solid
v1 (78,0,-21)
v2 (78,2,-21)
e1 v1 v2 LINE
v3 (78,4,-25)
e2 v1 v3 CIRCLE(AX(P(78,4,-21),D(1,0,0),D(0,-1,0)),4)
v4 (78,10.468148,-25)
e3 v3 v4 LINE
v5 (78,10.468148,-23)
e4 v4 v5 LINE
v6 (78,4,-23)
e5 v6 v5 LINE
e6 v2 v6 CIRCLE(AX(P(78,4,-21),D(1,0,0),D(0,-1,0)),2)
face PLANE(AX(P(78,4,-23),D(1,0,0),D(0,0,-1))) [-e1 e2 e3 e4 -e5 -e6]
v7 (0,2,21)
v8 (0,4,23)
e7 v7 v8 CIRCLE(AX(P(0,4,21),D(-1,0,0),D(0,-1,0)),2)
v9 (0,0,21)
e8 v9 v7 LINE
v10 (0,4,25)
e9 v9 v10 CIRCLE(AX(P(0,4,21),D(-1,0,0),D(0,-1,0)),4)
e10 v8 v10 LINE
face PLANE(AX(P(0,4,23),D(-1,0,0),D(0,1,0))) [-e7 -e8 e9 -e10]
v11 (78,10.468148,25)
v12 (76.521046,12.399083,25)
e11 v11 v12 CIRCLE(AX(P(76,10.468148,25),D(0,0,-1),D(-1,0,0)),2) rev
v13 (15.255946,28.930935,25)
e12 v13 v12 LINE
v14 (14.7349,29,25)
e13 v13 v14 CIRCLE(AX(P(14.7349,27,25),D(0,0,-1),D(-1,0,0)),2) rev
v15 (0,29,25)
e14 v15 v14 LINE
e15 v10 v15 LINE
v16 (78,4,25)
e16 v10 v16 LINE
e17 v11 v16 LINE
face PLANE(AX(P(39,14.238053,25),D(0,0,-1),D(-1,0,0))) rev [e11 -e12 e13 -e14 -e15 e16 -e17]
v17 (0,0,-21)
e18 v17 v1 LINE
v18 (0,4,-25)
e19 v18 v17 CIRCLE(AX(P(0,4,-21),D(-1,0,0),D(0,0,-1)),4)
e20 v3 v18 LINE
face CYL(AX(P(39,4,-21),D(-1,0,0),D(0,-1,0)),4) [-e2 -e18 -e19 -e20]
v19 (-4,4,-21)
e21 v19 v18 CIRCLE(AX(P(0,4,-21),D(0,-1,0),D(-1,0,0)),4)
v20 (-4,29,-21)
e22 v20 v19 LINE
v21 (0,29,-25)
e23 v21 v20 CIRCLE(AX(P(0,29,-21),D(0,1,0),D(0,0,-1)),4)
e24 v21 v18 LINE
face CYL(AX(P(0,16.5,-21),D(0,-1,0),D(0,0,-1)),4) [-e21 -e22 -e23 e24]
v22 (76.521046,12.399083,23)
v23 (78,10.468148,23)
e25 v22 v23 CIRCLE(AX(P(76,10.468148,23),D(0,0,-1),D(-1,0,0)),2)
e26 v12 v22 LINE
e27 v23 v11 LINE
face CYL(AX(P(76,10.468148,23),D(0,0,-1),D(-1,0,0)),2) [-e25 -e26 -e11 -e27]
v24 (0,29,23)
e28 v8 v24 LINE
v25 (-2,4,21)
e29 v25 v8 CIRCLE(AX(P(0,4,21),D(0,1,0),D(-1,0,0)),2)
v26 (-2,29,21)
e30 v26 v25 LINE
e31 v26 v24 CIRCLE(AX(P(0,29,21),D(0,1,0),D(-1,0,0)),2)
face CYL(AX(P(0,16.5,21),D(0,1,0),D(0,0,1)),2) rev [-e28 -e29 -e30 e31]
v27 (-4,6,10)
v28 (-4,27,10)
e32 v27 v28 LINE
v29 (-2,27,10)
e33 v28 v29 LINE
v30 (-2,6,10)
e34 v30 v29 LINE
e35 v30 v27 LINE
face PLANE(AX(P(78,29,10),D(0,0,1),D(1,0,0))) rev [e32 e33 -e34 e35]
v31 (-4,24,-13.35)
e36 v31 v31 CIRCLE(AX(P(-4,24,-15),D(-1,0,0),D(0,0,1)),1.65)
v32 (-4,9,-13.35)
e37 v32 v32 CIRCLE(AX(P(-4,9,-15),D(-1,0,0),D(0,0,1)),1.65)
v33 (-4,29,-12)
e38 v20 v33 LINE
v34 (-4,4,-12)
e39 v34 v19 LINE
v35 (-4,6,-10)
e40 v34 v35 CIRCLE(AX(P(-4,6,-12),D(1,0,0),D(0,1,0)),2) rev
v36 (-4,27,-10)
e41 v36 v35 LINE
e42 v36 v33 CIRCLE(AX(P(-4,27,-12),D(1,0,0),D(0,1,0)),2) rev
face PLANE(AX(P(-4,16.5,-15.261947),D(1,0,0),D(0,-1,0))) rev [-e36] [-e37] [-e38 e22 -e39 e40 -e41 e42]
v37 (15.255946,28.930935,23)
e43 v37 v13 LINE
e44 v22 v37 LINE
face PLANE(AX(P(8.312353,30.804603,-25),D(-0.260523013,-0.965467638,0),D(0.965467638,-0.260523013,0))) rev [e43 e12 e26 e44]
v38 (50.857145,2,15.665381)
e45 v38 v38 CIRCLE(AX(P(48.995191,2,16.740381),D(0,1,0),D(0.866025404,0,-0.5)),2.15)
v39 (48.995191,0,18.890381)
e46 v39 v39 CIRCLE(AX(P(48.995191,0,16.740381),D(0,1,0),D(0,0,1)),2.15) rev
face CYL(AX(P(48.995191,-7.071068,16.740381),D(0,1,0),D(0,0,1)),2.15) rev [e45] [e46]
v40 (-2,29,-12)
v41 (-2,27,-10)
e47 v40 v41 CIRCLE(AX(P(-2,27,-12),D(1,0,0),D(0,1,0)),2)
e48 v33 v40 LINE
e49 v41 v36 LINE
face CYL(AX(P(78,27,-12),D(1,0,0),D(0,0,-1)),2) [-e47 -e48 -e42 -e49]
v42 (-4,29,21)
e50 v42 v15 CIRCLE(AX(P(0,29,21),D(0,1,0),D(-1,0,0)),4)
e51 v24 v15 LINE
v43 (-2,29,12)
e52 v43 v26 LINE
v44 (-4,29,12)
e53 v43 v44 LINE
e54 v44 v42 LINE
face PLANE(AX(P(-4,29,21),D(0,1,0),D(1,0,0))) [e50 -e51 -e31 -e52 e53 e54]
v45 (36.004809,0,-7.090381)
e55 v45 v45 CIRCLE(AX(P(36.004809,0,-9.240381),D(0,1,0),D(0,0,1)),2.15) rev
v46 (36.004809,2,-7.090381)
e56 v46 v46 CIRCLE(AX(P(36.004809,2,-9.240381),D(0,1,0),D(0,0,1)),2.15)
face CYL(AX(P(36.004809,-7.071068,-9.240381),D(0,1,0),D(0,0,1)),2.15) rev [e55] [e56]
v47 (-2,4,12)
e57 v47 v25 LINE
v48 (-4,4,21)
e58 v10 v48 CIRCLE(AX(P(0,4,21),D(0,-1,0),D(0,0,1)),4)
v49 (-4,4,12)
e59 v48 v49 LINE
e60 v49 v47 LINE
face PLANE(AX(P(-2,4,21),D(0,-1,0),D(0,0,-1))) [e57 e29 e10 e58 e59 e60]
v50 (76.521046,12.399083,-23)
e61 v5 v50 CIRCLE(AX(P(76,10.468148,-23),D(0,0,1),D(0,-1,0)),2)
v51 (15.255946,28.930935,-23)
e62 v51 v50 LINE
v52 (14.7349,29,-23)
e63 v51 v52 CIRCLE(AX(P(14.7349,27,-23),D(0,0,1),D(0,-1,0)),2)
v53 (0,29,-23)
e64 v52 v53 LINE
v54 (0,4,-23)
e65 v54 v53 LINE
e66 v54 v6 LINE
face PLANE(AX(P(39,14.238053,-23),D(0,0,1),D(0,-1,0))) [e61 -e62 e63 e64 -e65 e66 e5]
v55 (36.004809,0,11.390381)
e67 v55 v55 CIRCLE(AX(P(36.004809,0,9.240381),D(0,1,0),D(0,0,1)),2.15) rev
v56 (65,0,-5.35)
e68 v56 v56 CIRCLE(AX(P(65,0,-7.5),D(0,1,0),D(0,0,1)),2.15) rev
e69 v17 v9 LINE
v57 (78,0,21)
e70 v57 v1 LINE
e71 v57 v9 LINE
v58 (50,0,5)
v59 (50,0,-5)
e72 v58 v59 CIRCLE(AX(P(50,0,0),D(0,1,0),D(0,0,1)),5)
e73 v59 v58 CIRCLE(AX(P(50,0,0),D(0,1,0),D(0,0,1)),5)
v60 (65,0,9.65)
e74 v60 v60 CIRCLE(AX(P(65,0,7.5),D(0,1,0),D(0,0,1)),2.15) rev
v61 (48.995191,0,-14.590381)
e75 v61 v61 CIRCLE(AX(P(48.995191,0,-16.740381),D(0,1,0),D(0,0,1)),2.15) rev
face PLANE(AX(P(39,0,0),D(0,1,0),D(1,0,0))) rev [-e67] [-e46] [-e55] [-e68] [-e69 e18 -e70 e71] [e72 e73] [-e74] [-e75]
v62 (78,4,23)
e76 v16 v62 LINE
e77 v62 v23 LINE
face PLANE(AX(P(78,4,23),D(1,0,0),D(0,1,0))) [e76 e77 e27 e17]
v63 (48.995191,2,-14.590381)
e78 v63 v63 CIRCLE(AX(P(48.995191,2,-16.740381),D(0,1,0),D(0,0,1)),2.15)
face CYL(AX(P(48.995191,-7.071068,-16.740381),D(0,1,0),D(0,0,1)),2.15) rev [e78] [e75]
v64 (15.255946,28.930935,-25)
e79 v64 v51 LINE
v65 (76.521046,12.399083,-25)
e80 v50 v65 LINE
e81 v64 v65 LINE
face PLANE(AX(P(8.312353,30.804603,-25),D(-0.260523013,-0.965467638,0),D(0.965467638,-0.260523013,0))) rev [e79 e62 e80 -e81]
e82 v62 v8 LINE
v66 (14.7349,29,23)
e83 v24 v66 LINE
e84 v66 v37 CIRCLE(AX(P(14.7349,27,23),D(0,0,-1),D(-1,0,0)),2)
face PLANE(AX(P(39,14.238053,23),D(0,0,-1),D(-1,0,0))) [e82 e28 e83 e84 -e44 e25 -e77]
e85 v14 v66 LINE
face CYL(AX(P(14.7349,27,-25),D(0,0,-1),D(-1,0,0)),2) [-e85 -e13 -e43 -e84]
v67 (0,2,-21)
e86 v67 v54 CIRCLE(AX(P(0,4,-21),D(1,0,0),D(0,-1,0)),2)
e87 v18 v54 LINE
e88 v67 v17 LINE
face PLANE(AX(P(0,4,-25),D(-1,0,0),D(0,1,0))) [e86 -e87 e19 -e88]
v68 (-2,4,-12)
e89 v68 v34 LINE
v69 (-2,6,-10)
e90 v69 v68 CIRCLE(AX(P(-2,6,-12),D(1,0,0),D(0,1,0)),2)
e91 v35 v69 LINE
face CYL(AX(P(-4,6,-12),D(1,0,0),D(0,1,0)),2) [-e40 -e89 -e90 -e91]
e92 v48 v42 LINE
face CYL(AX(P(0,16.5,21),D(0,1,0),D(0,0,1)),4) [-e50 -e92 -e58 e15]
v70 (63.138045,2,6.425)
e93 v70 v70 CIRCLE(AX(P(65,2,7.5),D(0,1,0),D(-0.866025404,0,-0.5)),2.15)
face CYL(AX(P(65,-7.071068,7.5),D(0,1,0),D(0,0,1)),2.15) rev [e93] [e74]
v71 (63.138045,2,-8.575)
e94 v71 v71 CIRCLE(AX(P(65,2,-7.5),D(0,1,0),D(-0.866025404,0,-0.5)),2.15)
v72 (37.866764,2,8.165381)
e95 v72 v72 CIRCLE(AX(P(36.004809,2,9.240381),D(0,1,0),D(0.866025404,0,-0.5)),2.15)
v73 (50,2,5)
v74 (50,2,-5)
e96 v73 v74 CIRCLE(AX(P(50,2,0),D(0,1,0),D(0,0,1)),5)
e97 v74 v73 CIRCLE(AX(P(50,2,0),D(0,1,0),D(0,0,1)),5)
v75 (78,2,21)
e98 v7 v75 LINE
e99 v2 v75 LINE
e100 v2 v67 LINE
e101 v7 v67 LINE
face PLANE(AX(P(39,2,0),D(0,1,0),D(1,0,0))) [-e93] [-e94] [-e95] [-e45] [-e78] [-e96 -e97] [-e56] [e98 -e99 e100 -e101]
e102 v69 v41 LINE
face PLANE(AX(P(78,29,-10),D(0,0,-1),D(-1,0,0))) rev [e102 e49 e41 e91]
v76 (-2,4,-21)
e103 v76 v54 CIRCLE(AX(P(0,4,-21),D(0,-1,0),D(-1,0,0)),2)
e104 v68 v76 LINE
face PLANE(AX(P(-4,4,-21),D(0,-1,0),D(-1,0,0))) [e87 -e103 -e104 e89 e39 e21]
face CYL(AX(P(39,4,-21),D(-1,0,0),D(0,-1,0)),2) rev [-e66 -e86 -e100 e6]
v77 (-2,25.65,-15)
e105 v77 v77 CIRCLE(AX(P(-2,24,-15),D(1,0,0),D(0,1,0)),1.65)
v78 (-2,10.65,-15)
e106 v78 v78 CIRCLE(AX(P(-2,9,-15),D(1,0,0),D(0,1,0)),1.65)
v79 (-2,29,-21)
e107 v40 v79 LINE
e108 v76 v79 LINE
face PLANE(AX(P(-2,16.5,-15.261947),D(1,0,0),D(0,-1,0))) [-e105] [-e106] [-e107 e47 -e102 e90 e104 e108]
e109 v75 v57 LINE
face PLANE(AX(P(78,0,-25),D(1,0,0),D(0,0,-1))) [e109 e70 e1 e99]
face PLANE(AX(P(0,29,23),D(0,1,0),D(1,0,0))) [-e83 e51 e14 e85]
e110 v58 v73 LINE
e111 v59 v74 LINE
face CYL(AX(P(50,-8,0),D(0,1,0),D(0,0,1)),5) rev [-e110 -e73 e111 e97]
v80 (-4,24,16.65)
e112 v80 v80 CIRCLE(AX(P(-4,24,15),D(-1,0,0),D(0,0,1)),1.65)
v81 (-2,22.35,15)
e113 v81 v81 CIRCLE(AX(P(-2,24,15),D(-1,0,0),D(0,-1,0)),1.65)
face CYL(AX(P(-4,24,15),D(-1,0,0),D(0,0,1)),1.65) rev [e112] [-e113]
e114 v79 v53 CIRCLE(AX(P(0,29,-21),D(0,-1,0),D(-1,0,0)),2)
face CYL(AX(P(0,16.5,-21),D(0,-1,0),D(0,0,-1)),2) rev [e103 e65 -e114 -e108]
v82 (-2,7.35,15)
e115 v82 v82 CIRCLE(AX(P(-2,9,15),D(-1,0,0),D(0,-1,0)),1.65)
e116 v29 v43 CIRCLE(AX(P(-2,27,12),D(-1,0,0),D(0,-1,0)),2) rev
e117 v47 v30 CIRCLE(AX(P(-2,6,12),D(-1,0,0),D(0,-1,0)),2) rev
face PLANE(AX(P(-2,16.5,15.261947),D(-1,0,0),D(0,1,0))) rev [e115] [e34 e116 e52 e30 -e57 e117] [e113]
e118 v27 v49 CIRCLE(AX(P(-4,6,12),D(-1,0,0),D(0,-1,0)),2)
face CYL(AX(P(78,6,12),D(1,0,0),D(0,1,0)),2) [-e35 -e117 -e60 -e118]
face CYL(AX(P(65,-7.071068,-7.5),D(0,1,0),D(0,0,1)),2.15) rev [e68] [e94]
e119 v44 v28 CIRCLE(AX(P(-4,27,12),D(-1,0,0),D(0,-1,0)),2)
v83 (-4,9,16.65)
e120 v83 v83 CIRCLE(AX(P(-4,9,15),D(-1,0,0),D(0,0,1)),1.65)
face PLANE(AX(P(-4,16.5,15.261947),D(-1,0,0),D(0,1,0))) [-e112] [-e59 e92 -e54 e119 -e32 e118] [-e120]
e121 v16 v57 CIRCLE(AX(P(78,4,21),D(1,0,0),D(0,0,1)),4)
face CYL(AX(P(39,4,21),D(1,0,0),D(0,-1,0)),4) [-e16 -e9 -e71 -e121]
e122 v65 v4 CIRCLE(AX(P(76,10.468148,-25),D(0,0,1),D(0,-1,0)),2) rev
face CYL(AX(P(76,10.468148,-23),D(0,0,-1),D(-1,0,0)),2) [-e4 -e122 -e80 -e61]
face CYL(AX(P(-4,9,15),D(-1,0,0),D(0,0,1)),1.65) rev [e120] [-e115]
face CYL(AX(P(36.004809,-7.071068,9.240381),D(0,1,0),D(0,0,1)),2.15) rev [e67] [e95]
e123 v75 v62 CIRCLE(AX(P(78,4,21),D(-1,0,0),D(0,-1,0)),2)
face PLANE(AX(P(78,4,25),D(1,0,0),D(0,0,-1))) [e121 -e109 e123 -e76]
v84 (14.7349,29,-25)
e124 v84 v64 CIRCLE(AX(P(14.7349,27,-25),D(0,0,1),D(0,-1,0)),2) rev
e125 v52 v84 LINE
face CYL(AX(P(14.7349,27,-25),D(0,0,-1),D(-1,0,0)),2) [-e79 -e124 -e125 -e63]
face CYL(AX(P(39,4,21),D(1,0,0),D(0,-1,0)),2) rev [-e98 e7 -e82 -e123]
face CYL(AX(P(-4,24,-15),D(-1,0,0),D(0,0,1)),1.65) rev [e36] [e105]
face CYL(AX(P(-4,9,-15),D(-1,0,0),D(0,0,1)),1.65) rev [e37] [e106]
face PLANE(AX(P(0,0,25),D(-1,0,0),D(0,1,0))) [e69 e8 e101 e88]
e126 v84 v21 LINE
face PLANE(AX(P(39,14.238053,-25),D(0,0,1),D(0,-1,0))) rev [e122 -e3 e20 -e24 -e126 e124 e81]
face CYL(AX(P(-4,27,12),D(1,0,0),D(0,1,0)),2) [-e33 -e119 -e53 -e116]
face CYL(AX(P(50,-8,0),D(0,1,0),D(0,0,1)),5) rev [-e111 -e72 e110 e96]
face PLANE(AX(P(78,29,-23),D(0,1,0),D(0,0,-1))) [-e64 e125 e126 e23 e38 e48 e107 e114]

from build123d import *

# Parameters (mm, degrees)
EXTRUDE_1_DEPTH          = 78
EXTRUDE_START            = -4
EXTRUDE_1_2_OUTLINE_R    = 2.1
EXTRUDE_1_2_DEPTH        = 4
EXTRUDE_START_2          = -1
EXTRUDE_1_3_OUTLINE_R    = 5
EXTRUDE_1_3_OUTLINE_R_2  = 2.5
EXTRUDE_1_3_DEPTH        = 30
EXTRUDE_START_3          = -25
EXTRUDE_1_4_DEPTH        = 2
EXTRUDE_2_DEPTH          = 2
CUT_EXTRUDE_1_DEPTH      = 98.082439195
FILLET_1_R               = 2
EXTRUDE_START_4          = -2
SKETCH_4_R               = 2.1
SKETCH_4_R_2             = 1
EXTRUDE_3_DEPTH          = 2
HOLE_WIZARD_M4_1_D       = 3.3
HOLE_WIZARD_M4_1_DEPTH   = 11.5
HOLE_WIZARD_M4_1_TIP     = 0.991420021
SKETCH_8_W               = 20
SKETCH_8_H               = 25
CUT_EXTRUDE_2_DEPTH      = 91.498618774
FILLET_2_R               = 2
SKETCH_9_R               = 2.5
SKETCH_9_R_2             = 2.15
EXTRUDE_4_DEPTH          = 2
PATTERN_CIRCULAR_2_COUNT = 3


with BuildPart() as part:
    # ﾎﾞｽ - 押し出し1: read off the stored shape, not the designer's step
    # ﾎﾞｽ - 押し出し1 outline → ﾎﾞｽ - 押し出し1 (new body)
    with BuildSketch(Plane.YZ):
        with BuildLine():
            Line((29, 25), (4, 25))
            ThreePointArc((4, 25), (1.171572875, 23.828427125), (0, 21))
            Line((0, 21), (0, -21))
            ThreePointArc((0, -21), (1.171572875, -23.828427125), (4, -25))
            Line((4, -25), (29, -25))
            Line((29, -25), (29, -23))
            Line((29, -23), (4, -23))
            ThreePointArc((4, -23), (2.585786438, -22.414213562), (2, -21))
            Line((2, -21), (2, 21))
            ThreePointArc((2, 21), (2.585786438, 22.414213562), (4, 23))
            Line((4, 23), (29, 23))
            Line((29, 23), (29, 25))
        make_face()
    extrude(amount=EXTRUDE_1_DEPTH)

    # Extrude 1 2 outline → Extrude 1 2 (add)
    # profile 1 of 2: a face of its own
    with BuildSketch(Plane.YZ.offset(EXTRUDE_START)):
        with BuildLine():
            ThreePointArc((4, 8), (4.228361402, 6.851949703), (4.878679656, 5.878679656))
            ThreePointArc((4.878679656, 5.878679656), (5.851949703, 5.228361402), (7, 5))
            Line((7, 5), (26, 5))
            ThreePointArc((26, 5), (27.148050297, 5.228361402), (28.121320344, 5.878679656))
            ThreePointArc((28.121320344, 5.878679656), (28.771638598, 6.851949703), (29, 8))
            Line((29, 8), (29, 25))
            Line((29, 25), (4, 25))
            Line((4, 25), (4, 8))
        make_face()
        with Locations((9, 15)):
            Circle(EXTRUDE_1_2_OUTLINE_R, mode=Mode.SUBTRACT)
        with Locations((24, 15)):
            Circle(EXTRUDE_1_2_OUTLINE_R, mode=Mode.SUBTRACT)
    # profile 2 of 2: a face of its own
    with BuildSketch(Plane.YZ.offset(EXTRUDE_START)):
        with BuildLine():
            Line((4, -25), (29, -25))
            Line((29, -25), (29, -8))
            ThreePointArc((29, -8), (28.771638598, -6.851949703), (28.121320344, -5.878679656))
            ThreePointArc((28.121320344, -5.878679656), (27.148050297, -5.228361402), (26, -5))
            Line((26, -5), (7, -5))
            ThreePointArc((7, -5), (5.851949703, -5.228361402), (4.878679656, -5.878679656))
            ThreePointArc((4.878679656, -5.878679656), (4.228361402, -6.851949703), (4, -8))
            Line((4, -8), (4, -25))
        make_face()
        with Locations((9, -15)):
            Circle(EXTRUDE_1_2_OUTLINE_R, mode=Mode.SUBTRACT)
        with Locations((24, -15)):
            Circle(EXTRUDE_1_2_OUTLINE_R, mode=Mode.SUBTRACT)
    extrude(amount=EXTRUDE_1_2_DEPTH)

    # Extrude 1 3 outline → Extrude 1 3 (cut)
    with BuildSketch(Plane(origin=(0, 0, 0), x_dir=(1, 0, 0), z_dir=(0, 1, 0)).offset(EXTRUDE_START_2)):
        with Locations((50, 0)):
            Circle(EXTRUDE_1_3_OUTLINE_R)
        with BuildLine():
            Line((0, -5), (-2, -5))
            Line((-2, -5), (-2, -21))
            ThreePointArc((-2, -21), (-1.414213562, -22.414213562), (0, -23))
            Line((0, -23), (0, -5))
        make_face()
        with BuildLine():
            ThreePointArc((0, -25), (-2.828427125, -23.828427125), (-4, -21))
            Line((-4, -21), (-4, -25))
            Line((-4, -25), (0, -25))
        make_face()
        with BuildLine():
            Line((0, 5), (0, 23))
            ThreePointArc((0, 23), (-1.414213562, 22.414213562), (-2, 21))
            Line((-2, 21), (-2, 5))
            Line((-2, 5), (0, 5))
        make_face()
        with BuildLine():
            ThreePointArc((-4, 21), (-2.828427125, 23.828427125), (0, 25))
            Line((0, 25), (-4, 25))
            Line((-4, 25), (-4, 21))
        make_face()
        with Locations((36.004809472, 9.240381057)):
            Circle(EXTRUDE_1_3_OUTLINE_R_2)
        with Locations((48.995190528, -16.740381057)):
            Circle(EXTRUDE_1_3_OUTLINE_R_2)
        with Locations((65, -7.5)):
            Circle(EXTRUDE_1_3_OUTLINE_R_2)
        with Locations((65, 7.5)):
            Circle(EXTRUDE_1_3_OUTLINE_R_2)
        with Locations((36.004809472, -9.240381057)):
            Circle(EXTRUDE_1_3_OUTLINE_R_2)
        with Locations((48.995190528, 16.740381057)):
            Circle(EXTRUDE_1_3_OUTLINE_R_2)
    extrude(amount=EXTRUDE_1_3_DEPTH, mode=Mode.SUBTRACT)

    # Extrude 1 4 outline → Extrude 1 4 (cut)
    with BuildSketch(Plane.XY.offset(EXTRUDE_START_3)):
        with BuildLine():
            ThreePointArc((76.562947136, 7.421535507), (77.140312684, 7.145469965), (77.600920715, 6.701168941))
            ThreePointArc((77.600920715, 6.701168941), (77.89760921, 6.134124767), (78, 5.502397544))
            Line((78, 5.502397544), (78, 29))
            Line((78, 29), (2.712718898, 29))
            ThreePointArc((2.712718898, 29), (2.855262652, 28.994913852), (2.997081408, 28.979681278))
            ThreePointArc((2.997081408, 28.979681278), (3.137453853, 28.954379753), (3.275666034, 28.919137963))
            Line((3.275666034, 28.919137963), (76.562947136, 7.421535507))
        make_face()
    extrude(amount=EXTRUDE_1_4_DEPTH, mode=Mode.SUBTRACT)

    # ｽｹｯﾁ2 → ﾎﾞｽ - 押し出し2 (add)
    with BuildSketch(Plane(origin=(0, 0, -25), x_dir=(-1, 0, 0), z_dir=(0, 0, -1))):
        with BuildLine():
            ThreePointArc((-2.997081408, 28.979681278), (-2.855262652, 28.994913852), (-2.712718898, 29))
            Line((-2.712718898, 29), (-78, 29))
            Line((-78, 29), (-78, 5.502397544))
            ThreePointArc((-78, 5.502397544), (-77.89760921, 6.134124767), (-77.600920715, 6.701168941))
            ThreePointArc((-77.600920715, 6.701168941), (-77.140312684, 7.145469965), (-76.562947136, 7.421535507))
            Line((-76.562947136, 7.421535507), (-3.275666034, 28.919137963))
            ThreePointArc((-3.275666034, 28.919137963), (-3.137453853, 28.954379753), (-2.997081408, 28.979681278))
        make_face()
    extrude(amount=-EXTRUDE_2_DEPTH)

    # ｽｹｯﾁ3 → ｶｯﾄ - 押し出し1 (cut, through all)
    with BuildSketch(Plane.XY.offset(25)):
        Polygon((78, 29), (15, 29), (78, 12), align=None)
    extrude(amount=-CUT_EXTRUDE_1_DEPTH, mode=Mode.SUBTRACT)

    # ﾌｨﾚｯﾄ1
    fillet_1_edges = [part.edges().sort_by_distance(p)[0] for p in [
        (15, 29, -24),
        (78, 12, -24),
        (15, 29, 24),
        (78, 12, 24),
    ]]
    fillet(fillet_1_edges, radius=FILLET_1_R)

    # ｽｹｯﾁ4 → ﾎﾞｽ - 押し出し3 (add)
    # profile 1 of 2: a face of its own
    with BuildSketch(Plane(origin=(-2, 0, 0), x_dir=(0, 0, -1), z_dir=(1, 0, 0)).offset(EXTRUDE_START_4)):
        with Locations((-15, 9)):
            Circle(SKETCH_4_R)
        with Locations(Location((-15, 9, 0), (0, 0, 90))):
            Circle(SKETCH_4_R_2, mode=Mode.SUBTRACT)
    # profile 2 of 2: a face of its own
    with BuildSketch(Plane(origin=(-2, 0, 0), x_dir=(0, 0, -1), z_dir=(1, 0, 0)).offset(EXTRUDE_START_4)):
        with Locations((-15, 24)):
            Circle(SKETCH_4_R)
        with Locations(Location((-15, 24, 0), (0, 0, 90))):
            Circle(SKETCH_4_R_2, mode=Mode.SUBTRACT)
    extrude_3 = extrude(amount=EXTRUDE_3_DEPTH)

    # ﾐﾗｰ2: ﾎﾞｽ - 押し出し3 across plane
    add(extrude_3.mirror(Plane.XY))

    # M4 ねじ穴1
    with Locations(Plane.ZY.offset(4)):
        with Locations((-15, 9), (-15, 24), (15, 24), (15, 9)):
            Hole(HOLE_WIZARD_M4_1_D / 2, depth=HOLE_WIZARD_M4_1_DEPTH)
            with Locations((0, 0, -(HOLE_WIZARD_M4_1_DEPTH + HOLE_WIZARD_M4_1_TIP / 2))):  # 118° drill point
                Cone(0, HOLE_WIZARD_M4_1_D / 2, HOLE_WIZARD_M4_1_TIP, mode=Mode.SUBTRACT)

    # ｽｹｯﾁ8 → ｶｯﾄ - 押し出し2 (cut, through all)
    with BuildSketch(Plane.ZY.offset(4)):
        with Locations((0, 16.5)):
            Rectangle(SKETCH_8_W, SKETCH_8_H)
    extrude(amount=-CUT_EXTRUDE_2_DEPTH, mode=Mode.SUBTRACT)

    # ﾌｨﾚｯﾄ2
    fillet_2_edges = [part.edges().sort_by_distance(p)[0] for p in [
        (-3, 29, 10),
        (-3, 4, 10),
        (-3, 4, -10),
        (-3, 29, -10),
    ]]
    fillet(fillet_2_edges, radius=FILLET_2_R)

    # ｽｹｯﾁ9 → ﾎﾞｽ - 押し出し4 (add)
    # profile 1 of 2: a face of its own
    with BuildSketch(Plane(origin=(0, 2, 0), x_dir=(1, 0, 0), z_dir=(0, 1, 0)).offset(EXTRUDE_START_4)):
        with Locations((48.995190528, 16.740381057)):
            Circle(SKETCH_9_R)
        with Locations(Location((48.995190528, 16.740381057, 0), (0, 0, 270))):
            Circle(SKETCH_9_R_2, mode=Mode.SUBTRACT)
    # profile 2 of 2: a face of its own
    with BuildSketch(Plane(origin=(0, 2, 0), x_dir=(1, 0, 0), z_dir=(0, 1, 0)).offset(EXTRUDE_START_4)):
        with Locations((36.004809472, 9.240381057)):
            Circle(SKETCH_9_R)
        with Locations(Location((36.004809472, 9.240381057, 0), (0, 0, 270))):
            Circle(SKETCH_9_R_2, mode=Mode.SUBTRACT)
    extrude_4 = extrude(amount=EXTRUDE_4_DEPTH)

    # 円形ﾊﾟﾀｰﾝ2: ﾎﾞｽ - 押し出し4 ×3 about axis
    pattern_circular_2_axis = Axis((50, 0, 0), (0, 1, 0))
    for i in range(1, PATTERN_CIRCULAR_2_COUNT):
        add(extrude_4.rotate(pattern_circular_2_axis, i * 360 / PATTERN_CIRCULAR_2_COUNT))


solid = part.part
